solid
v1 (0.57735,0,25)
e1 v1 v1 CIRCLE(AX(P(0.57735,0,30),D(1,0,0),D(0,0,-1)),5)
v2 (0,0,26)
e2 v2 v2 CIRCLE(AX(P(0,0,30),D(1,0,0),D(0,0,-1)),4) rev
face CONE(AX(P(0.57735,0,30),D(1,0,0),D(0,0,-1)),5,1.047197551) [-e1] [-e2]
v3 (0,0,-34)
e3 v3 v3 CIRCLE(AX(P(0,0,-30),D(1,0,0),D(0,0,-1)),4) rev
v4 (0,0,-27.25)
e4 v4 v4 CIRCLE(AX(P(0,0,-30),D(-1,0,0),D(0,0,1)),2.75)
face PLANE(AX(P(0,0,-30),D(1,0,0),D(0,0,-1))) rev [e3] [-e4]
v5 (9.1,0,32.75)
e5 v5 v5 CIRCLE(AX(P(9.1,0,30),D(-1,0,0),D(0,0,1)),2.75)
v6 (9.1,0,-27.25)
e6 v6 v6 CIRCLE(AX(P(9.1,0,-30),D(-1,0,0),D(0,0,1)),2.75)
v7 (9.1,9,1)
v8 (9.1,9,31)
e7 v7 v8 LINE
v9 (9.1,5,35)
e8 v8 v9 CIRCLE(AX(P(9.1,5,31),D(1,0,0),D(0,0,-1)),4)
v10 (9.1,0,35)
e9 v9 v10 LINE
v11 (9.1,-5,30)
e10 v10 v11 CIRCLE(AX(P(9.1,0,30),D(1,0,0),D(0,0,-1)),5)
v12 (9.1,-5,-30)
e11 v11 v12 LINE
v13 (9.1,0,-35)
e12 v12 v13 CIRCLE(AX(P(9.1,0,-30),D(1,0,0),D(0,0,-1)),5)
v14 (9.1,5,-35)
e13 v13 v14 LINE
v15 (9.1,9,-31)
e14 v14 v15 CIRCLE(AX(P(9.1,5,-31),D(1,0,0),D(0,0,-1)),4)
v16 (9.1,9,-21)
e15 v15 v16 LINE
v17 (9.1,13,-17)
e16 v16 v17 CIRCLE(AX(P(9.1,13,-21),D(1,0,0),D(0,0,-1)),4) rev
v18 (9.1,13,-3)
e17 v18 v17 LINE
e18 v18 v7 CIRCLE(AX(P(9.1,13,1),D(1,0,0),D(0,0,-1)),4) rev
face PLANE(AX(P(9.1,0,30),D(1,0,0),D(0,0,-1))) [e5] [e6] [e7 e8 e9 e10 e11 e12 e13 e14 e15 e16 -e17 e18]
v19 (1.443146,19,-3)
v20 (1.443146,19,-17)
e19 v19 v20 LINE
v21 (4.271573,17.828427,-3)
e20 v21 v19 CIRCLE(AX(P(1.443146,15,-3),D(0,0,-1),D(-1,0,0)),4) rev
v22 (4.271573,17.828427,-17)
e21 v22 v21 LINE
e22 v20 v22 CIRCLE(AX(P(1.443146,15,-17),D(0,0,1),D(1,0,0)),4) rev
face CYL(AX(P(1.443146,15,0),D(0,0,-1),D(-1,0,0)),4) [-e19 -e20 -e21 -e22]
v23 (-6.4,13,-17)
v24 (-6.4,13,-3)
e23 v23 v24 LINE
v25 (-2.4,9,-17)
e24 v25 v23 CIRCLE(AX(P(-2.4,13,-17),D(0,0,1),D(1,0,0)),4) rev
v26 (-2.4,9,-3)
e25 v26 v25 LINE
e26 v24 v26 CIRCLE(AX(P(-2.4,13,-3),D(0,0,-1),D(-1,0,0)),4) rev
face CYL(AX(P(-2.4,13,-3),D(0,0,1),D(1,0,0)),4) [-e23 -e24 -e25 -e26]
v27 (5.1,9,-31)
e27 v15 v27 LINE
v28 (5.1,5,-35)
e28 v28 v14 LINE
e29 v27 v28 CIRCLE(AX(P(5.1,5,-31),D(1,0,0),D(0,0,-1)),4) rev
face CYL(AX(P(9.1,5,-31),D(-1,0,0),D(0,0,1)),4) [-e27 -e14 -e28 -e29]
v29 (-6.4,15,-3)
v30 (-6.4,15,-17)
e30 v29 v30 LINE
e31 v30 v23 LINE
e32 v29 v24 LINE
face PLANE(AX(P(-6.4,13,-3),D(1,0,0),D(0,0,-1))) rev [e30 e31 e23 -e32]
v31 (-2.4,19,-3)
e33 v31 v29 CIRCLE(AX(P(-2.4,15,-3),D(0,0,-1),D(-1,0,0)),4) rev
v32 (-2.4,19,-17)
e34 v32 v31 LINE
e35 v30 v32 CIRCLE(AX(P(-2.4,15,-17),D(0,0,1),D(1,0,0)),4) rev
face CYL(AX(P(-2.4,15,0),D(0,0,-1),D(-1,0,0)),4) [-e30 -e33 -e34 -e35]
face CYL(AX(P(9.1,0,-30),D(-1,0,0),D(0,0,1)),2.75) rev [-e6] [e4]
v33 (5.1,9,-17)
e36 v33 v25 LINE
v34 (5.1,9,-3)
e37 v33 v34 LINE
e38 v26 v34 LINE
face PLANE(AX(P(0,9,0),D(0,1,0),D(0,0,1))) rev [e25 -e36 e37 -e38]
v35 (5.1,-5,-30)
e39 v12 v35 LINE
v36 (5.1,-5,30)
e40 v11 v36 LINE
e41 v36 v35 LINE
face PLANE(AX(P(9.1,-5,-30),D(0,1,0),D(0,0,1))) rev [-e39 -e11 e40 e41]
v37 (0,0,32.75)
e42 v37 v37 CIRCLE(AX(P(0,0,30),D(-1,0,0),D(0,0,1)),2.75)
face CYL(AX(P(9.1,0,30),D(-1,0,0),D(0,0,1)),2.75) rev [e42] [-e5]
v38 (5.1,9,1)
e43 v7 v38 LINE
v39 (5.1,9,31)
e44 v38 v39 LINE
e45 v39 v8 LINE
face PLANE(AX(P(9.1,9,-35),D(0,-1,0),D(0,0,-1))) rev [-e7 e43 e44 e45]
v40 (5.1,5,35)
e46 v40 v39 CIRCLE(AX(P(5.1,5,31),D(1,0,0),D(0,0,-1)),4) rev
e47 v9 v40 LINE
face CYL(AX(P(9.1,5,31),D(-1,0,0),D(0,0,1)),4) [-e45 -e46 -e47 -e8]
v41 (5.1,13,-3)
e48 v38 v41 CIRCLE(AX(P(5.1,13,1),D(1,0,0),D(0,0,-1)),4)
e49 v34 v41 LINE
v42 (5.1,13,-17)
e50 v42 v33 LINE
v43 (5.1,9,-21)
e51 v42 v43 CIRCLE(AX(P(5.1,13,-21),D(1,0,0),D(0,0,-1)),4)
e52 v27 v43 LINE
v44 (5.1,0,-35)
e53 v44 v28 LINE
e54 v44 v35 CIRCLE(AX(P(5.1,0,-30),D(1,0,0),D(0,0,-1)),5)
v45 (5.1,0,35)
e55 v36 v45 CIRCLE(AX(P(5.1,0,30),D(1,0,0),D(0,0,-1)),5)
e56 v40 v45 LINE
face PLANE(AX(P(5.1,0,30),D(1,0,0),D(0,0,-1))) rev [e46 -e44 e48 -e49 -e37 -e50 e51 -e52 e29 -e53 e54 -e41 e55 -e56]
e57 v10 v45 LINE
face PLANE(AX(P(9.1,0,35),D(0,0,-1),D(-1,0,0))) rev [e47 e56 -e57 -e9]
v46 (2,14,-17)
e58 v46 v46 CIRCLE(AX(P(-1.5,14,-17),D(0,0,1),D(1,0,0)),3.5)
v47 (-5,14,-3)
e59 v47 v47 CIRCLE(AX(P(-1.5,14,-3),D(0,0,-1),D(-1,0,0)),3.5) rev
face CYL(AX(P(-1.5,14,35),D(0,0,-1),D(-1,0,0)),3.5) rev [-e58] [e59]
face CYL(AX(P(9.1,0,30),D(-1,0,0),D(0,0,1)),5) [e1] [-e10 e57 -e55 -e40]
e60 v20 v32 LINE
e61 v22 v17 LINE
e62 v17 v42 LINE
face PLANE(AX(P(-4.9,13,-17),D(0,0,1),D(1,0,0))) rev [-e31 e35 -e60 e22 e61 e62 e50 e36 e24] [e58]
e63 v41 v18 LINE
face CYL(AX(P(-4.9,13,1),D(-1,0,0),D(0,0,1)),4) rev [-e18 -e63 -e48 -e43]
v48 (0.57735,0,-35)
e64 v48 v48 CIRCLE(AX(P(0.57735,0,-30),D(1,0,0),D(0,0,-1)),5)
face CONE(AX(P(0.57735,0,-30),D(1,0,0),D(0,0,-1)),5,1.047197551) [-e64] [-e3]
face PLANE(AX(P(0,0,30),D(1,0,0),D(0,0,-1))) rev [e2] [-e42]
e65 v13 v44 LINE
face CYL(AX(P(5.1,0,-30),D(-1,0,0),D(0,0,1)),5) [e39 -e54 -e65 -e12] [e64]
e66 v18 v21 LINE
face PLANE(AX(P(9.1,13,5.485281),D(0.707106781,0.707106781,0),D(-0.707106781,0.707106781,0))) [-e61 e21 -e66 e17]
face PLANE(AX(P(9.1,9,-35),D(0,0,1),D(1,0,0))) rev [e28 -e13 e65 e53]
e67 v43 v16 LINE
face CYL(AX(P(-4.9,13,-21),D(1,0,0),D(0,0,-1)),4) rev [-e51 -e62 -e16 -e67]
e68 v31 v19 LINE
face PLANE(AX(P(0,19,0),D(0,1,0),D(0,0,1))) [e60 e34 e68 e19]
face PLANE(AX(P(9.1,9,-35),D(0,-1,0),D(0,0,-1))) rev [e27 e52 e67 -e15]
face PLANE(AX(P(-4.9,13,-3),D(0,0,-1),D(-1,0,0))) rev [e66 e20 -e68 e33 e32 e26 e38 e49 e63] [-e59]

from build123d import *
from OCP.BRepFilletAPI import BRepFilletAPI_MakeChamfer

# Parameters (mm, degrees)
SKETCH1_R             = 5
BOSS_EXTRUDE1_DEPTH   = 5.1
BOSS_EXTRUDE1_2_DEPTH = 5.1
BOSS_EXTRUDE2_DEPTH   = 4
BOSS_EXTRUDE3_DEPTH   = 4
BOSS_EXTRUDE4_DEPTH   = 6
SKETCH5_R             = 3.5
CUT_EXTRUDE1_DEPTH    = 57.105347339
SKETCH7_R             = 2.75
CUT_EXTRUDE2_DEPTH    = 41.851070977
BOSS_EXTRUDE5_DEPTH   = 14
FILLET1_R             = 4
FILLET2_R             = 4
FILLET3_R             = 4
CHAMFER1_SIZE         = 1
CHAMFER1_SIZE2        = 0.577350269


with BuildPart() as part:
    # Sketch1 → Boss-Extrude1 (new body)
    with BuildSketch(Plane(origin=(0, 0, 0), x_dir=(0, 0, -1), z_dir=(1, 0, 0))):
        with Locations((30, 0)):
            Circle(SKETCH1_R)
    extrude(amount=BOSS_EXTRUDE1_DEPTH)



with BuildPart() as body_2:
    # Sketch1 → Boss-Extrude1 2 (new body)
    with BuildSketch(Plane(origin=(0, 0, 0), x_dir=(0, 0, -1), z_dir=(1, 0, 0))):
        with Locations((-30, 0)):
            Circle(SKETCH1_R)
    extrude(amount=BOSS_EXTRUDE1_2_DEPTH)


with BuildPart() as part_1:
    add(part.part)

    add(body_2.part)  # Boss-Extrude2 merges body 2
    # Sketch2 → Boss-Extrude2 (add)
    with BuildSketch(Plane(origin=(5.1, 0, 0), x_dir=(0, 0, -1), z_dir=(1, 0, 0))):
        with BuildLine():
            Line((30, -5), (-30, -5))
            ThreePointArc((-30, -5), (-33.535533906, -3.535533906), (-35, 0))
            Line((-35, 0), (-35, 5))
            Line((-35, 5), (-35, 9))
            Line((-35, 9), (35, 9))
            Line((35, 9), (35, 0))
            ThreePointArc((35, 0), (33.535533906, -3.535533906), (30, -5))
        make_face()
    extrude(amount=BOSS_EXTRUDE2_DEPTH)

    # Sketch3 → Boss-Extrude3 (add)
    with BuildSketch(Plane(origin=(0, 9, 0), x_dir=(1, 0, 0), z_dir=(0, 1, 0))):
        Polygon((5.1, 17), (-4.9, 17), (-6.4, 17), (-6.4, 3), (-4.9, 3), (9.1, 3), (9.1, 17), align=None)
    extrude(amount=BOSS_EXTRUDE3_DEPTH)

    # Sketch4 → Boss-Extrude4 (add)
    with BuildSketch(Plane(origin=(0, 13, 0), x_dir=(1, 0, 0), z_dir=(0, 1, 0))):
        Polygon((3.1, 17), (-6.4, 17), (-6.4, 3), (3.1, 3), (3.1, 10), align=None)
    extrude(amount=BOSS_EXTRUDE4_DEPTH)

    # Sketch5 → Cut-Extrude1 (cut, through all)
    with BuildSketch(Plane.XY.offset(-17)):
        with Locations(Location((-1.5, 14, 0), (0, 0, 180))):
            Circle(SKETCH5_R)
    extrude(amount=CUT_EXTRUDE1_DEPTH, mode=Mode.SUBTRACT)

    # Sketch7 → Cut-Extrude2 (cut, through all)
    with BuildSketch(Plane.ZY):
        with Locations((-30, 0)):
            Circle(SKETCH7_R)
        with Locations((30, 0)):
            Circle(SKETCH7_R)
    extrude(amount=-CUT_EXTRUDE2_DEPTH, mode=Mode.SUBTRACT)

    # Sketch8 → Boss-Extrude5 (add)
    with BuildSketch(Plane(origin=(0, 0, -17), x_dir=(-1, 0, 0), z_dir=(0, 0, -1))):
        Polygon((-9.1, 13), (-3.1, 19), (-3.1, 13), align=None)
    extrude(amount=-BOSS_EXTRUDE5_DEPTH)

    # Fillet1
    fillet1_edges = [part_1.edges().sort_by_distance(p)[0] for p in [
        (-6.4, 9, -10),
        (-6.4, 19, -10),
        (3.1, 19, -10),
    ]]
    fillet(fillet1_edges, radius=FILLET1_R - 0.0001)  # a hair under: the kernel refuses the full size

    # Fillet2
    fillet2_edges = [part_1.edges().sort_by_distance(p)[0] for p in [
        (7.1, 9, -3),
        (7.1, 9, -17),
    ]]
    fillet(fillet2_edges, radius=FILLET2_R)

    # Fillet3
    fillet3_edges = [part_1.edges().sort_by_distance(p)[0] for p in [
        (7.1, 9, -35),
        (7.1, 9, 35),
    ]]
    fillet(fillet3_edges, radius=FILLET3_R)

    # Chamfer1: one chamfer whose edges measure the first distance from different faces: ONE call of the kernel's chamfer builder (chamfer() names one face for all edges)
    chamfer1_edges_1 = [part_1.edges().sort_by_distance(p)[0] for p in [
        (0, 0, -25),
    ]]
    chamfer1_side_1 = [part_1.faces().sort_by_distance(p)[0] for p in [
        (0, 0, -25.141421356),
    ]]
    chamfer1_edges_2 = [part_1.edges().sort_by_distance(p)[0] for p in [
        (0, 0, 35),
    ]]
    chamfer1_side_2 = [part_1.faces().sort_by_distance(p)[0] for p in [
        (0, 0, 34.858578644),
    ]]
    chamfer1 = BRepFilletAPI_MakeChamfer(part_1.part.solid().wrapped)
    for e in chamfer1_edges_1:
        chamfer1.Add(CHAMFER1_SIZE, CHAMFER1_SIZE2, e.wrapped, chamfer1_side_1[0].wrapped)  # the first distance lies on this face
    for e in chamfer1_edges_2:
        chamfer1.Add(CHAMFER1_SIZE, CHAMFER1_SIZE2, e.wrapped, chamfer1_side_2[0].wrapped)  # the first distance lies on this face
    add(Compound.cast(chamfer1.Shape()), mode=Mode.REPLACE)


solid = part_1.part
